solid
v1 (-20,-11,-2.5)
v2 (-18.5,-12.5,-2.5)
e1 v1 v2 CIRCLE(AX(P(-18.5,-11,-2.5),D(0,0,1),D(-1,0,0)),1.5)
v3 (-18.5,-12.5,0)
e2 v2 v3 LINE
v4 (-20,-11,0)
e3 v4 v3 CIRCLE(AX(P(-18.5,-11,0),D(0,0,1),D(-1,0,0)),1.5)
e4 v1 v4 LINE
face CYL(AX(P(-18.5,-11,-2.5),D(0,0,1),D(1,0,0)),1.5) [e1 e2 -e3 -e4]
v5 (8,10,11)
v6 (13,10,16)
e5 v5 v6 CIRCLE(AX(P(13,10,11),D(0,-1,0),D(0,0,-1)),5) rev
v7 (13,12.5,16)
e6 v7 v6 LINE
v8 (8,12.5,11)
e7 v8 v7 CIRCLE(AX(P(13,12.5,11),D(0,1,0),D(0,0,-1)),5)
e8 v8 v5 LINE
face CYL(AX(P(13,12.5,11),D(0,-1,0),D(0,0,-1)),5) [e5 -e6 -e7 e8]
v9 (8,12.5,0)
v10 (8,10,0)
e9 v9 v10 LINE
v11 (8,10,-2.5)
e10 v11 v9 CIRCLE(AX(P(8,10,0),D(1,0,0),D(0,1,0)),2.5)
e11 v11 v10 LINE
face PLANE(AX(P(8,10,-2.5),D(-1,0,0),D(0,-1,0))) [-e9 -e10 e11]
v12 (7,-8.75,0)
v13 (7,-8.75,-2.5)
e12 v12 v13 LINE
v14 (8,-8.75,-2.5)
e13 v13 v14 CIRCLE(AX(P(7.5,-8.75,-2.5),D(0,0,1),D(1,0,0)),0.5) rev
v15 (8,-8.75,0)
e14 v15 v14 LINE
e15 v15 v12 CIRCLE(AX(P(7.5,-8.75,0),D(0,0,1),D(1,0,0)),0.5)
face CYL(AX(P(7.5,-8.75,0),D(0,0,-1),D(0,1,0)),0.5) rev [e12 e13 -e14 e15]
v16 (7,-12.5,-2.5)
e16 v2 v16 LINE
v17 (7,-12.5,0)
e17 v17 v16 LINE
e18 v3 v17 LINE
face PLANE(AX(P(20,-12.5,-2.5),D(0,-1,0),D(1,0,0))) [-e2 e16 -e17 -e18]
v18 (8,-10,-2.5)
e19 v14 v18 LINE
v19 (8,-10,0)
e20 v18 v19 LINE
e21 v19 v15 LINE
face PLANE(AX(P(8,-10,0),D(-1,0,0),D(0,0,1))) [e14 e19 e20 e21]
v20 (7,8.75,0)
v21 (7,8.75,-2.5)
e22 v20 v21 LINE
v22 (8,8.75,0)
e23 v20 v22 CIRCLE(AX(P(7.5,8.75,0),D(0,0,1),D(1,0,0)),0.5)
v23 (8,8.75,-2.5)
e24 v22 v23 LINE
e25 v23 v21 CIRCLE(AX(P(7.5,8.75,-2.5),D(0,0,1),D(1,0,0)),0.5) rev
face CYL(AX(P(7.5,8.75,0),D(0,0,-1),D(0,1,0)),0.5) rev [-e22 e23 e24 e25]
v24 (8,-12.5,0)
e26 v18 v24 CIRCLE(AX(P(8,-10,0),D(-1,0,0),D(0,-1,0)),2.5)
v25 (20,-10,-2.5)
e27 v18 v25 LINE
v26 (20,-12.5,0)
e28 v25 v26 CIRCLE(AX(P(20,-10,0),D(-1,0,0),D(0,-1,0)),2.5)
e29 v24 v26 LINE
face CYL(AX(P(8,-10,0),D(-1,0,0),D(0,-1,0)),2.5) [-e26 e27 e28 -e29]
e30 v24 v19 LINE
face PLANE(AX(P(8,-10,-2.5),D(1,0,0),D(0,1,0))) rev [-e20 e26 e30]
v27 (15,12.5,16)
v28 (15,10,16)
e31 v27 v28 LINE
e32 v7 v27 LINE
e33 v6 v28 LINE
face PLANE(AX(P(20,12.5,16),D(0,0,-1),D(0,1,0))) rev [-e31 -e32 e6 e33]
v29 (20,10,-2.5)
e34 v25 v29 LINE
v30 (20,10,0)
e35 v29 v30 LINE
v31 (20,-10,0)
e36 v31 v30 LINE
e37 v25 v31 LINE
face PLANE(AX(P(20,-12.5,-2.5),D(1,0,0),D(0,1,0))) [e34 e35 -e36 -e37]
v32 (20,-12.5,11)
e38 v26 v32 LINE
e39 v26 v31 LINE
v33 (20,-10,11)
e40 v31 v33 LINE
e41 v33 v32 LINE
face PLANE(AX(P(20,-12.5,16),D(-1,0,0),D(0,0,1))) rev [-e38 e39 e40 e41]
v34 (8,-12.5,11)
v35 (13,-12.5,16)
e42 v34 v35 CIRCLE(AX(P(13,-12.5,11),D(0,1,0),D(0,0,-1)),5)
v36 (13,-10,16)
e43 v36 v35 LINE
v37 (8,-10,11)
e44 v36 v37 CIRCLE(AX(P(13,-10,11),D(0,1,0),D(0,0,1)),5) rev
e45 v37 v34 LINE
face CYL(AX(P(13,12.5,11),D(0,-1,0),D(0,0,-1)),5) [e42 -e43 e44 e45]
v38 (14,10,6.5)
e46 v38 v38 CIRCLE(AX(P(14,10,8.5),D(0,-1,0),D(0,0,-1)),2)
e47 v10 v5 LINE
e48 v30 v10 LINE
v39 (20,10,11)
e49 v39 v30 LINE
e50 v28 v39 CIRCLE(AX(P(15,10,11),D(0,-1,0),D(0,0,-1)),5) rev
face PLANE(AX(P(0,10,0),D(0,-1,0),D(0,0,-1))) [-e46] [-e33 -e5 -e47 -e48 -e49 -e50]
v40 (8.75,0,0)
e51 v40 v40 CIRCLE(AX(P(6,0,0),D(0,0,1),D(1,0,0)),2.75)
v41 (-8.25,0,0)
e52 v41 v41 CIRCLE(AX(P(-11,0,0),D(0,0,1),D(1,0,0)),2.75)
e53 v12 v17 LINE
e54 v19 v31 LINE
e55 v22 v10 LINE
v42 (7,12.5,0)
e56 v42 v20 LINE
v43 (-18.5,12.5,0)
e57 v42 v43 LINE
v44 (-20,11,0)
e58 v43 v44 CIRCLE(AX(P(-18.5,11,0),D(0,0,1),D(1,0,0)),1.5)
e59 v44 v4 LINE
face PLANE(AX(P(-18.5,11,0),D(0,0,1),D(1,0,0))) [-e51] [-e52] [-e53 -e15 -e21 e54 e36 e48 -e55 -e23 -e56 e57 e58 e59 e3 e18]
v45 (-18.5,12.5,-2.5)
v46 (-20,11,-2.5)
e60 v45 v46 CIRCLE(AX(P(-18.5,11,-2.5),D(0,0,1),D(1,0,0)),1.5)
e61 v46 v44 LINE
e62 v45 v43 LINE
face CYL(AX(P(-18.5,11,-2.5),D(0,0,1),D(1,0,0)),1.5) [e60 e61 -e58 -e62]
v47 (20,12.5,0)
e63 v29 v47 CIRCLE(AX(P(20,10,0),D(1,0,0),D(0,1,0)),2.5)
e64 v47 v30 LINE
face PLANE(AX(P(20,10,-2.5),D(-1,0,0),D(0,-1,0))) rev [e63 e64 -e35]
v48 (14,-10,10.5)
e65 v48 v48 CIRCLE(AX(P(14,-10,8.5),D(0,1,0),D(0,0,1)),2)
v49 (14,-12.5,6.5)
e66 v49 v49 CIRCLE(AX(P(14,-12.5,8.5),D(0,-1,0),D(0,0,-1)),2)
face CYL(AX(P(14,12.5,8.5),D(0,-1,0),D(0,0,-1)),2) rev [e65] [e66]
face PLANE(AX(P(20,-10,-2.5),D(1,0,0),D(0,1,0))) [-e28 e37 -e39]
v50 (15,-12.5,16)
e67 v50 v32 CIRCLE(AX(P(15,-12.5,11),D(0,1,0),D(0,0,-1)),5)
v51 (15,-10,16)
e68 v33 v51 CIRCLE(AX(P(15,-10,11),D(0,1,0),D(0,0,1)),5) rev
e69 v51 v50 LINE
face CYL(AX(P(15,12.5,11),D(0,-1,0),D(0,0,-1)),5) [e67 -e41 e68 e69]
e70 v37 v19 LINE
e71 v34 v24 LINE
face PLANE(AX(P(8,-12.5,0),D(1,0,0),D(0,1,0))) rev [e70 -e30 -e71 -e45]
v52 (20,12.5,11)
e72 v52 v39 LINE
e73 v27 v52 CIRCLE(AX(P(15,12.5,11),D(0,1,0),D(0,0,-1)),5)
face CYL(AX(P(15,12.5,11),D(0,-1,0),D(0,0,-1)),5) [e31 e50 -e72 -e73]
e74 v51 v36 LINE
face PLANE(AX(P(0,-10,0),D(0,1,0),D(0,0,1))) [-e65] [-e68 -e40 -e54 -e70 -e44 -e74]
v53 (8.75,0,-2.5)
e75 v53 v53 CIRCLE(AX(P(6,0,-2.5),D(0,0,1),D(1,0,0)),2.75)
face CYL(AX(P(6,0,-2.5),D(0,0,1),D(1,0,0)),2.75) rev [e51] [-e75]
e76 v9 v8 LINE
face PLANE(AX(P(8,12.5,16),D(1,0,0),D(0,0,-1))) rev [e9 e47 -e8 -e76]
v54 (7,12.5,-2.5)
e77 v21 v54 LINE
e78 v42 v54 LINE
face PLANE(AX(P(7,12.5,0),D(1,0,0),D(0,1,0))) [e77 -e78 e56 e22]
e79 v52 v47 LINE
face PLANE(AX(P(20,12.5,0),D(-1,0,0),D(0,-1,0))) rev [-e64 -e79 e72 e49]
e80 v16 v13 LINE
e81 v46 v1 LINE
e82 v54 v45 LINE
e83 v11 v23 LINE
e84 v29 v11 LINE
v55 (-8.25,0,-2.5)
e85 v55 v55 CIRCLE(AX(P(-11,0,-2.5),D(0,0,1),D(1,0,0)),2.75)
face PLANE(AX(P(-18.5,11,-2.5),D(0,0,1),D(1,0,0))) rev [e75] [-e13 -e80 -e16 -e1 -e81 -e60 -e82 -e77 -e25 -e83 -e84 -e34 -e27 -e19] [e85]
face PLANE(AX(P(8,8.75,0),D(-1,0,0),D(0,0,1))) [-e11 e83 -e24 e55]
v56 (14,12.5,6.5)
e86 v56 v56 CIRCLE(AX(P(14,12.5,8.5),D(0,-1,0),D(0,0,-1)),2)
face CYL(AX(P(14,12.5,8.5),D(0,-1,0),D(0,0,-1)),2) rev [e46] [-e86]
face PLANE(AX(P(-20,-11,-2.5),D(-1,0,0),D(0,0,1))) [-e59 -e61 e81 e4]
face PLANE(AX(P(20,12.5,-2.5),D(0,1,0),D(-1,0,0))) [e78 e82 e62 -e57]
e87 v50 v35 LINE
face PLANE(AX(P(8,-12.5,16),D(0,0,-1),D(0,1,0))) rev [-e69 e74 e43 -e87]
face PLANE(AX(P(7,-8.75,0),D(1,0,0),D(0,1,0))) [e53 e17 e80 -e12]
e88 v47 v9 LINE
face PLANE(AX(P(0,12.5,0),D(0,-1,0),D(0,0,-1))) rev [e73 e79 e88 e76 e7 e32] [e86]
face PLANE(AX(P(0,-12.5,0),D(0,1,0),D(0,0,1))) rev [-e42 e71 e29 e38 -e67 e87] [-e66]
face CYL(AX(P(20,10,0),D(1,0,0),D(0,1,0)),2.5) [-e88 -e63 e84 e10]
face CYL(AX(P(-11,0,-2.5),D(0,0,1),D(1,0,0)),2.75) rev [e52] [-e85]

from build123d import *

# Parameters (mm, degrees)
SCHIZZO1_R                 = 2.75
BASE_FLANGIA1_DEPTH        = 2.5
BORDO_FLANGIA1_START       = -2.5
BORDO_FLANGIA1_DEPTH       = 2.5
BORDO_FLANGIA1_2_OUTLINE_W = 12
BORDO_FLANGIA1_2_OUTLINE_H = 2.5
BORDO_FLANGIA1_2_DEPTH     = 16
BORDO_FLANGIA1_START_2     = 8
BORDO_FLANGIA1_3_DEPTH     = 13
SCHIZZO12_R                = 2
TAGLIO_ESTRUSIONE1_DEPTH   = 25
TAGLIO_ESTRUSIONE2_DEPTH   = 25


with BuildPart() as part:
    # Base-Flangia1: sheet metal written as solids
    # Schizzo1 → Base-Flangia1 (new body)
    with BuildSketch(Plane.XY):
        with BuildLine():
            Line((20, -12.5), (-18.5, -12.5))
            ThreePointArc((-18.5, -12.5), (-19.560660172, -12.060660172), (-20, -11))
            Line((-20, -11), (-20, 11))
            ThreePointArc((-20, 11), (-19.560660172, 12.060660172), (-18.5, 12.5))
            Line((-18.5, 12.5), (20, 12.5))
            Line((20, 12.5), (20, -12.5))
        make_face()
        with Locations((-11, 0)):
            Circle(SCHIZZO1_R, mode=Mode.SUBTRACT)
        with Locations((6, 0)):
            Circle(SCHIZZO1_R, mode=Mode.SUBTRACT)
    extrude(amount=-BASE_FLANGIA1_DEPTH)

    # Bordo-Flangia1: read off the stored shape, not the designer's step
    # Bordo-Flangia1 outline → Bordo-Flangia1 (cut)
    with BuildSketch(Plane.XY.offset(BORDO_FLANGIA1_START)):
        with BuildLine():
            Line((8, 8.75), (8, 12.5))
            Line((8, 12.5), (7, 12.5))
            Line((7, 12.5), (7, 8.75))
            ThreePointArc((7, 8.75), (7.5, 8.25), (8, 8.75))
        make_face()
        with BuildLine():
            Line((8, -12.5), (8, -8.75))
            ThreePointArc((8, -8.75), (7.5, -8.25), (7, -8.75))
            Line((7, -8.75), (7, -12.5))
            Line((7, -12.5), (8, -12.5))
        make_face()
    extrude(amount=BORDO_FLANGIA1_DEPTH, mode=Mode.SUBTRACT)

    # Bordo-Flangia1 2 outline → Bordo-Flangia1 2 (add)
    with BuildSketch(Plane.XY):
        with Locations((14, 11.25)):
            Rectangle(BORDO_FLANGIA1_2_OUTLINE_W, BORDO_FLANGIA1_2_OUTLINE_H)
        with Locations((14, -11.25)):
            Rectangle(BORDO_FLANGIA1_2_OUTLINE_W, BORDO_FLANGIA1_2_OUTLINE_H)
    extrude(amount=BORDO_FLANGIA1_2_DEPTH)

    # Bordo-Flangia1 3 outline → Bordo-Flangia1 3 (cut)
    with BuildSketch(Plane.YZ.offset(BORDO_FLANGIA1_START_2)):
        with BuildLine():
            Line((-12.5, -2.5), (-10, -2.5))
            ThreePointArc((-10, -2.5), (-11.767766953, -1.767766953), (-12.5, 0))
            Line((-12.5, 0), (-12.5, -2.5))
        make_face()
        with BuildLine():
            ThreePointArc((12.5, 0), (11.767766953, -1.767766953), (10, -2.5))
            Line((10, -2.5), (12.5, -2.5))
            Line((12.5, -2.5), (12.5, 0))
        make_face()
    extrude(amount=BORDO_FLANGIA1_3_DEPTH, mode=Mode.SUBTRACT)

    # Schizzo12 → Taglio-Estrusione1 (cut)
    with BuildSketch(Plane.XZ.offset(12.5)):
        with Locations(Location((14, 8.5, 0), (0, 0, 270))):
            Circle(SCHIZZO12_R)
    extrude(amount=-TAGLIO_ESTRUSIONE1_DEPTH, mode=Mode.SUBTRACT)

    # Schizzo13 → Taglio-Estrusione2 (cut)
    with BuildSketch(Plane.XZ.offset(12.5)):
        with BuildLine():
            Line((8, 11), (8, 16))
            Line((8, 16), (13, 16))
            ThreePointArc((13, 16), (9.464466094, 14.535533906), (8, 11))
        make_face()
        with BuildLine():
            Line((20, 16), (20, 11))
            ThreePointArc((20, 11), (18.535533906, 14.535533906), (15, 16))
            Line((15, 16), (20, 16))
        make_face()
    extrude(amount=-TAGLIO_ESTRUSIONE2_DEPTH, mode=Mode.SUBTRACT)


solid = part.part
